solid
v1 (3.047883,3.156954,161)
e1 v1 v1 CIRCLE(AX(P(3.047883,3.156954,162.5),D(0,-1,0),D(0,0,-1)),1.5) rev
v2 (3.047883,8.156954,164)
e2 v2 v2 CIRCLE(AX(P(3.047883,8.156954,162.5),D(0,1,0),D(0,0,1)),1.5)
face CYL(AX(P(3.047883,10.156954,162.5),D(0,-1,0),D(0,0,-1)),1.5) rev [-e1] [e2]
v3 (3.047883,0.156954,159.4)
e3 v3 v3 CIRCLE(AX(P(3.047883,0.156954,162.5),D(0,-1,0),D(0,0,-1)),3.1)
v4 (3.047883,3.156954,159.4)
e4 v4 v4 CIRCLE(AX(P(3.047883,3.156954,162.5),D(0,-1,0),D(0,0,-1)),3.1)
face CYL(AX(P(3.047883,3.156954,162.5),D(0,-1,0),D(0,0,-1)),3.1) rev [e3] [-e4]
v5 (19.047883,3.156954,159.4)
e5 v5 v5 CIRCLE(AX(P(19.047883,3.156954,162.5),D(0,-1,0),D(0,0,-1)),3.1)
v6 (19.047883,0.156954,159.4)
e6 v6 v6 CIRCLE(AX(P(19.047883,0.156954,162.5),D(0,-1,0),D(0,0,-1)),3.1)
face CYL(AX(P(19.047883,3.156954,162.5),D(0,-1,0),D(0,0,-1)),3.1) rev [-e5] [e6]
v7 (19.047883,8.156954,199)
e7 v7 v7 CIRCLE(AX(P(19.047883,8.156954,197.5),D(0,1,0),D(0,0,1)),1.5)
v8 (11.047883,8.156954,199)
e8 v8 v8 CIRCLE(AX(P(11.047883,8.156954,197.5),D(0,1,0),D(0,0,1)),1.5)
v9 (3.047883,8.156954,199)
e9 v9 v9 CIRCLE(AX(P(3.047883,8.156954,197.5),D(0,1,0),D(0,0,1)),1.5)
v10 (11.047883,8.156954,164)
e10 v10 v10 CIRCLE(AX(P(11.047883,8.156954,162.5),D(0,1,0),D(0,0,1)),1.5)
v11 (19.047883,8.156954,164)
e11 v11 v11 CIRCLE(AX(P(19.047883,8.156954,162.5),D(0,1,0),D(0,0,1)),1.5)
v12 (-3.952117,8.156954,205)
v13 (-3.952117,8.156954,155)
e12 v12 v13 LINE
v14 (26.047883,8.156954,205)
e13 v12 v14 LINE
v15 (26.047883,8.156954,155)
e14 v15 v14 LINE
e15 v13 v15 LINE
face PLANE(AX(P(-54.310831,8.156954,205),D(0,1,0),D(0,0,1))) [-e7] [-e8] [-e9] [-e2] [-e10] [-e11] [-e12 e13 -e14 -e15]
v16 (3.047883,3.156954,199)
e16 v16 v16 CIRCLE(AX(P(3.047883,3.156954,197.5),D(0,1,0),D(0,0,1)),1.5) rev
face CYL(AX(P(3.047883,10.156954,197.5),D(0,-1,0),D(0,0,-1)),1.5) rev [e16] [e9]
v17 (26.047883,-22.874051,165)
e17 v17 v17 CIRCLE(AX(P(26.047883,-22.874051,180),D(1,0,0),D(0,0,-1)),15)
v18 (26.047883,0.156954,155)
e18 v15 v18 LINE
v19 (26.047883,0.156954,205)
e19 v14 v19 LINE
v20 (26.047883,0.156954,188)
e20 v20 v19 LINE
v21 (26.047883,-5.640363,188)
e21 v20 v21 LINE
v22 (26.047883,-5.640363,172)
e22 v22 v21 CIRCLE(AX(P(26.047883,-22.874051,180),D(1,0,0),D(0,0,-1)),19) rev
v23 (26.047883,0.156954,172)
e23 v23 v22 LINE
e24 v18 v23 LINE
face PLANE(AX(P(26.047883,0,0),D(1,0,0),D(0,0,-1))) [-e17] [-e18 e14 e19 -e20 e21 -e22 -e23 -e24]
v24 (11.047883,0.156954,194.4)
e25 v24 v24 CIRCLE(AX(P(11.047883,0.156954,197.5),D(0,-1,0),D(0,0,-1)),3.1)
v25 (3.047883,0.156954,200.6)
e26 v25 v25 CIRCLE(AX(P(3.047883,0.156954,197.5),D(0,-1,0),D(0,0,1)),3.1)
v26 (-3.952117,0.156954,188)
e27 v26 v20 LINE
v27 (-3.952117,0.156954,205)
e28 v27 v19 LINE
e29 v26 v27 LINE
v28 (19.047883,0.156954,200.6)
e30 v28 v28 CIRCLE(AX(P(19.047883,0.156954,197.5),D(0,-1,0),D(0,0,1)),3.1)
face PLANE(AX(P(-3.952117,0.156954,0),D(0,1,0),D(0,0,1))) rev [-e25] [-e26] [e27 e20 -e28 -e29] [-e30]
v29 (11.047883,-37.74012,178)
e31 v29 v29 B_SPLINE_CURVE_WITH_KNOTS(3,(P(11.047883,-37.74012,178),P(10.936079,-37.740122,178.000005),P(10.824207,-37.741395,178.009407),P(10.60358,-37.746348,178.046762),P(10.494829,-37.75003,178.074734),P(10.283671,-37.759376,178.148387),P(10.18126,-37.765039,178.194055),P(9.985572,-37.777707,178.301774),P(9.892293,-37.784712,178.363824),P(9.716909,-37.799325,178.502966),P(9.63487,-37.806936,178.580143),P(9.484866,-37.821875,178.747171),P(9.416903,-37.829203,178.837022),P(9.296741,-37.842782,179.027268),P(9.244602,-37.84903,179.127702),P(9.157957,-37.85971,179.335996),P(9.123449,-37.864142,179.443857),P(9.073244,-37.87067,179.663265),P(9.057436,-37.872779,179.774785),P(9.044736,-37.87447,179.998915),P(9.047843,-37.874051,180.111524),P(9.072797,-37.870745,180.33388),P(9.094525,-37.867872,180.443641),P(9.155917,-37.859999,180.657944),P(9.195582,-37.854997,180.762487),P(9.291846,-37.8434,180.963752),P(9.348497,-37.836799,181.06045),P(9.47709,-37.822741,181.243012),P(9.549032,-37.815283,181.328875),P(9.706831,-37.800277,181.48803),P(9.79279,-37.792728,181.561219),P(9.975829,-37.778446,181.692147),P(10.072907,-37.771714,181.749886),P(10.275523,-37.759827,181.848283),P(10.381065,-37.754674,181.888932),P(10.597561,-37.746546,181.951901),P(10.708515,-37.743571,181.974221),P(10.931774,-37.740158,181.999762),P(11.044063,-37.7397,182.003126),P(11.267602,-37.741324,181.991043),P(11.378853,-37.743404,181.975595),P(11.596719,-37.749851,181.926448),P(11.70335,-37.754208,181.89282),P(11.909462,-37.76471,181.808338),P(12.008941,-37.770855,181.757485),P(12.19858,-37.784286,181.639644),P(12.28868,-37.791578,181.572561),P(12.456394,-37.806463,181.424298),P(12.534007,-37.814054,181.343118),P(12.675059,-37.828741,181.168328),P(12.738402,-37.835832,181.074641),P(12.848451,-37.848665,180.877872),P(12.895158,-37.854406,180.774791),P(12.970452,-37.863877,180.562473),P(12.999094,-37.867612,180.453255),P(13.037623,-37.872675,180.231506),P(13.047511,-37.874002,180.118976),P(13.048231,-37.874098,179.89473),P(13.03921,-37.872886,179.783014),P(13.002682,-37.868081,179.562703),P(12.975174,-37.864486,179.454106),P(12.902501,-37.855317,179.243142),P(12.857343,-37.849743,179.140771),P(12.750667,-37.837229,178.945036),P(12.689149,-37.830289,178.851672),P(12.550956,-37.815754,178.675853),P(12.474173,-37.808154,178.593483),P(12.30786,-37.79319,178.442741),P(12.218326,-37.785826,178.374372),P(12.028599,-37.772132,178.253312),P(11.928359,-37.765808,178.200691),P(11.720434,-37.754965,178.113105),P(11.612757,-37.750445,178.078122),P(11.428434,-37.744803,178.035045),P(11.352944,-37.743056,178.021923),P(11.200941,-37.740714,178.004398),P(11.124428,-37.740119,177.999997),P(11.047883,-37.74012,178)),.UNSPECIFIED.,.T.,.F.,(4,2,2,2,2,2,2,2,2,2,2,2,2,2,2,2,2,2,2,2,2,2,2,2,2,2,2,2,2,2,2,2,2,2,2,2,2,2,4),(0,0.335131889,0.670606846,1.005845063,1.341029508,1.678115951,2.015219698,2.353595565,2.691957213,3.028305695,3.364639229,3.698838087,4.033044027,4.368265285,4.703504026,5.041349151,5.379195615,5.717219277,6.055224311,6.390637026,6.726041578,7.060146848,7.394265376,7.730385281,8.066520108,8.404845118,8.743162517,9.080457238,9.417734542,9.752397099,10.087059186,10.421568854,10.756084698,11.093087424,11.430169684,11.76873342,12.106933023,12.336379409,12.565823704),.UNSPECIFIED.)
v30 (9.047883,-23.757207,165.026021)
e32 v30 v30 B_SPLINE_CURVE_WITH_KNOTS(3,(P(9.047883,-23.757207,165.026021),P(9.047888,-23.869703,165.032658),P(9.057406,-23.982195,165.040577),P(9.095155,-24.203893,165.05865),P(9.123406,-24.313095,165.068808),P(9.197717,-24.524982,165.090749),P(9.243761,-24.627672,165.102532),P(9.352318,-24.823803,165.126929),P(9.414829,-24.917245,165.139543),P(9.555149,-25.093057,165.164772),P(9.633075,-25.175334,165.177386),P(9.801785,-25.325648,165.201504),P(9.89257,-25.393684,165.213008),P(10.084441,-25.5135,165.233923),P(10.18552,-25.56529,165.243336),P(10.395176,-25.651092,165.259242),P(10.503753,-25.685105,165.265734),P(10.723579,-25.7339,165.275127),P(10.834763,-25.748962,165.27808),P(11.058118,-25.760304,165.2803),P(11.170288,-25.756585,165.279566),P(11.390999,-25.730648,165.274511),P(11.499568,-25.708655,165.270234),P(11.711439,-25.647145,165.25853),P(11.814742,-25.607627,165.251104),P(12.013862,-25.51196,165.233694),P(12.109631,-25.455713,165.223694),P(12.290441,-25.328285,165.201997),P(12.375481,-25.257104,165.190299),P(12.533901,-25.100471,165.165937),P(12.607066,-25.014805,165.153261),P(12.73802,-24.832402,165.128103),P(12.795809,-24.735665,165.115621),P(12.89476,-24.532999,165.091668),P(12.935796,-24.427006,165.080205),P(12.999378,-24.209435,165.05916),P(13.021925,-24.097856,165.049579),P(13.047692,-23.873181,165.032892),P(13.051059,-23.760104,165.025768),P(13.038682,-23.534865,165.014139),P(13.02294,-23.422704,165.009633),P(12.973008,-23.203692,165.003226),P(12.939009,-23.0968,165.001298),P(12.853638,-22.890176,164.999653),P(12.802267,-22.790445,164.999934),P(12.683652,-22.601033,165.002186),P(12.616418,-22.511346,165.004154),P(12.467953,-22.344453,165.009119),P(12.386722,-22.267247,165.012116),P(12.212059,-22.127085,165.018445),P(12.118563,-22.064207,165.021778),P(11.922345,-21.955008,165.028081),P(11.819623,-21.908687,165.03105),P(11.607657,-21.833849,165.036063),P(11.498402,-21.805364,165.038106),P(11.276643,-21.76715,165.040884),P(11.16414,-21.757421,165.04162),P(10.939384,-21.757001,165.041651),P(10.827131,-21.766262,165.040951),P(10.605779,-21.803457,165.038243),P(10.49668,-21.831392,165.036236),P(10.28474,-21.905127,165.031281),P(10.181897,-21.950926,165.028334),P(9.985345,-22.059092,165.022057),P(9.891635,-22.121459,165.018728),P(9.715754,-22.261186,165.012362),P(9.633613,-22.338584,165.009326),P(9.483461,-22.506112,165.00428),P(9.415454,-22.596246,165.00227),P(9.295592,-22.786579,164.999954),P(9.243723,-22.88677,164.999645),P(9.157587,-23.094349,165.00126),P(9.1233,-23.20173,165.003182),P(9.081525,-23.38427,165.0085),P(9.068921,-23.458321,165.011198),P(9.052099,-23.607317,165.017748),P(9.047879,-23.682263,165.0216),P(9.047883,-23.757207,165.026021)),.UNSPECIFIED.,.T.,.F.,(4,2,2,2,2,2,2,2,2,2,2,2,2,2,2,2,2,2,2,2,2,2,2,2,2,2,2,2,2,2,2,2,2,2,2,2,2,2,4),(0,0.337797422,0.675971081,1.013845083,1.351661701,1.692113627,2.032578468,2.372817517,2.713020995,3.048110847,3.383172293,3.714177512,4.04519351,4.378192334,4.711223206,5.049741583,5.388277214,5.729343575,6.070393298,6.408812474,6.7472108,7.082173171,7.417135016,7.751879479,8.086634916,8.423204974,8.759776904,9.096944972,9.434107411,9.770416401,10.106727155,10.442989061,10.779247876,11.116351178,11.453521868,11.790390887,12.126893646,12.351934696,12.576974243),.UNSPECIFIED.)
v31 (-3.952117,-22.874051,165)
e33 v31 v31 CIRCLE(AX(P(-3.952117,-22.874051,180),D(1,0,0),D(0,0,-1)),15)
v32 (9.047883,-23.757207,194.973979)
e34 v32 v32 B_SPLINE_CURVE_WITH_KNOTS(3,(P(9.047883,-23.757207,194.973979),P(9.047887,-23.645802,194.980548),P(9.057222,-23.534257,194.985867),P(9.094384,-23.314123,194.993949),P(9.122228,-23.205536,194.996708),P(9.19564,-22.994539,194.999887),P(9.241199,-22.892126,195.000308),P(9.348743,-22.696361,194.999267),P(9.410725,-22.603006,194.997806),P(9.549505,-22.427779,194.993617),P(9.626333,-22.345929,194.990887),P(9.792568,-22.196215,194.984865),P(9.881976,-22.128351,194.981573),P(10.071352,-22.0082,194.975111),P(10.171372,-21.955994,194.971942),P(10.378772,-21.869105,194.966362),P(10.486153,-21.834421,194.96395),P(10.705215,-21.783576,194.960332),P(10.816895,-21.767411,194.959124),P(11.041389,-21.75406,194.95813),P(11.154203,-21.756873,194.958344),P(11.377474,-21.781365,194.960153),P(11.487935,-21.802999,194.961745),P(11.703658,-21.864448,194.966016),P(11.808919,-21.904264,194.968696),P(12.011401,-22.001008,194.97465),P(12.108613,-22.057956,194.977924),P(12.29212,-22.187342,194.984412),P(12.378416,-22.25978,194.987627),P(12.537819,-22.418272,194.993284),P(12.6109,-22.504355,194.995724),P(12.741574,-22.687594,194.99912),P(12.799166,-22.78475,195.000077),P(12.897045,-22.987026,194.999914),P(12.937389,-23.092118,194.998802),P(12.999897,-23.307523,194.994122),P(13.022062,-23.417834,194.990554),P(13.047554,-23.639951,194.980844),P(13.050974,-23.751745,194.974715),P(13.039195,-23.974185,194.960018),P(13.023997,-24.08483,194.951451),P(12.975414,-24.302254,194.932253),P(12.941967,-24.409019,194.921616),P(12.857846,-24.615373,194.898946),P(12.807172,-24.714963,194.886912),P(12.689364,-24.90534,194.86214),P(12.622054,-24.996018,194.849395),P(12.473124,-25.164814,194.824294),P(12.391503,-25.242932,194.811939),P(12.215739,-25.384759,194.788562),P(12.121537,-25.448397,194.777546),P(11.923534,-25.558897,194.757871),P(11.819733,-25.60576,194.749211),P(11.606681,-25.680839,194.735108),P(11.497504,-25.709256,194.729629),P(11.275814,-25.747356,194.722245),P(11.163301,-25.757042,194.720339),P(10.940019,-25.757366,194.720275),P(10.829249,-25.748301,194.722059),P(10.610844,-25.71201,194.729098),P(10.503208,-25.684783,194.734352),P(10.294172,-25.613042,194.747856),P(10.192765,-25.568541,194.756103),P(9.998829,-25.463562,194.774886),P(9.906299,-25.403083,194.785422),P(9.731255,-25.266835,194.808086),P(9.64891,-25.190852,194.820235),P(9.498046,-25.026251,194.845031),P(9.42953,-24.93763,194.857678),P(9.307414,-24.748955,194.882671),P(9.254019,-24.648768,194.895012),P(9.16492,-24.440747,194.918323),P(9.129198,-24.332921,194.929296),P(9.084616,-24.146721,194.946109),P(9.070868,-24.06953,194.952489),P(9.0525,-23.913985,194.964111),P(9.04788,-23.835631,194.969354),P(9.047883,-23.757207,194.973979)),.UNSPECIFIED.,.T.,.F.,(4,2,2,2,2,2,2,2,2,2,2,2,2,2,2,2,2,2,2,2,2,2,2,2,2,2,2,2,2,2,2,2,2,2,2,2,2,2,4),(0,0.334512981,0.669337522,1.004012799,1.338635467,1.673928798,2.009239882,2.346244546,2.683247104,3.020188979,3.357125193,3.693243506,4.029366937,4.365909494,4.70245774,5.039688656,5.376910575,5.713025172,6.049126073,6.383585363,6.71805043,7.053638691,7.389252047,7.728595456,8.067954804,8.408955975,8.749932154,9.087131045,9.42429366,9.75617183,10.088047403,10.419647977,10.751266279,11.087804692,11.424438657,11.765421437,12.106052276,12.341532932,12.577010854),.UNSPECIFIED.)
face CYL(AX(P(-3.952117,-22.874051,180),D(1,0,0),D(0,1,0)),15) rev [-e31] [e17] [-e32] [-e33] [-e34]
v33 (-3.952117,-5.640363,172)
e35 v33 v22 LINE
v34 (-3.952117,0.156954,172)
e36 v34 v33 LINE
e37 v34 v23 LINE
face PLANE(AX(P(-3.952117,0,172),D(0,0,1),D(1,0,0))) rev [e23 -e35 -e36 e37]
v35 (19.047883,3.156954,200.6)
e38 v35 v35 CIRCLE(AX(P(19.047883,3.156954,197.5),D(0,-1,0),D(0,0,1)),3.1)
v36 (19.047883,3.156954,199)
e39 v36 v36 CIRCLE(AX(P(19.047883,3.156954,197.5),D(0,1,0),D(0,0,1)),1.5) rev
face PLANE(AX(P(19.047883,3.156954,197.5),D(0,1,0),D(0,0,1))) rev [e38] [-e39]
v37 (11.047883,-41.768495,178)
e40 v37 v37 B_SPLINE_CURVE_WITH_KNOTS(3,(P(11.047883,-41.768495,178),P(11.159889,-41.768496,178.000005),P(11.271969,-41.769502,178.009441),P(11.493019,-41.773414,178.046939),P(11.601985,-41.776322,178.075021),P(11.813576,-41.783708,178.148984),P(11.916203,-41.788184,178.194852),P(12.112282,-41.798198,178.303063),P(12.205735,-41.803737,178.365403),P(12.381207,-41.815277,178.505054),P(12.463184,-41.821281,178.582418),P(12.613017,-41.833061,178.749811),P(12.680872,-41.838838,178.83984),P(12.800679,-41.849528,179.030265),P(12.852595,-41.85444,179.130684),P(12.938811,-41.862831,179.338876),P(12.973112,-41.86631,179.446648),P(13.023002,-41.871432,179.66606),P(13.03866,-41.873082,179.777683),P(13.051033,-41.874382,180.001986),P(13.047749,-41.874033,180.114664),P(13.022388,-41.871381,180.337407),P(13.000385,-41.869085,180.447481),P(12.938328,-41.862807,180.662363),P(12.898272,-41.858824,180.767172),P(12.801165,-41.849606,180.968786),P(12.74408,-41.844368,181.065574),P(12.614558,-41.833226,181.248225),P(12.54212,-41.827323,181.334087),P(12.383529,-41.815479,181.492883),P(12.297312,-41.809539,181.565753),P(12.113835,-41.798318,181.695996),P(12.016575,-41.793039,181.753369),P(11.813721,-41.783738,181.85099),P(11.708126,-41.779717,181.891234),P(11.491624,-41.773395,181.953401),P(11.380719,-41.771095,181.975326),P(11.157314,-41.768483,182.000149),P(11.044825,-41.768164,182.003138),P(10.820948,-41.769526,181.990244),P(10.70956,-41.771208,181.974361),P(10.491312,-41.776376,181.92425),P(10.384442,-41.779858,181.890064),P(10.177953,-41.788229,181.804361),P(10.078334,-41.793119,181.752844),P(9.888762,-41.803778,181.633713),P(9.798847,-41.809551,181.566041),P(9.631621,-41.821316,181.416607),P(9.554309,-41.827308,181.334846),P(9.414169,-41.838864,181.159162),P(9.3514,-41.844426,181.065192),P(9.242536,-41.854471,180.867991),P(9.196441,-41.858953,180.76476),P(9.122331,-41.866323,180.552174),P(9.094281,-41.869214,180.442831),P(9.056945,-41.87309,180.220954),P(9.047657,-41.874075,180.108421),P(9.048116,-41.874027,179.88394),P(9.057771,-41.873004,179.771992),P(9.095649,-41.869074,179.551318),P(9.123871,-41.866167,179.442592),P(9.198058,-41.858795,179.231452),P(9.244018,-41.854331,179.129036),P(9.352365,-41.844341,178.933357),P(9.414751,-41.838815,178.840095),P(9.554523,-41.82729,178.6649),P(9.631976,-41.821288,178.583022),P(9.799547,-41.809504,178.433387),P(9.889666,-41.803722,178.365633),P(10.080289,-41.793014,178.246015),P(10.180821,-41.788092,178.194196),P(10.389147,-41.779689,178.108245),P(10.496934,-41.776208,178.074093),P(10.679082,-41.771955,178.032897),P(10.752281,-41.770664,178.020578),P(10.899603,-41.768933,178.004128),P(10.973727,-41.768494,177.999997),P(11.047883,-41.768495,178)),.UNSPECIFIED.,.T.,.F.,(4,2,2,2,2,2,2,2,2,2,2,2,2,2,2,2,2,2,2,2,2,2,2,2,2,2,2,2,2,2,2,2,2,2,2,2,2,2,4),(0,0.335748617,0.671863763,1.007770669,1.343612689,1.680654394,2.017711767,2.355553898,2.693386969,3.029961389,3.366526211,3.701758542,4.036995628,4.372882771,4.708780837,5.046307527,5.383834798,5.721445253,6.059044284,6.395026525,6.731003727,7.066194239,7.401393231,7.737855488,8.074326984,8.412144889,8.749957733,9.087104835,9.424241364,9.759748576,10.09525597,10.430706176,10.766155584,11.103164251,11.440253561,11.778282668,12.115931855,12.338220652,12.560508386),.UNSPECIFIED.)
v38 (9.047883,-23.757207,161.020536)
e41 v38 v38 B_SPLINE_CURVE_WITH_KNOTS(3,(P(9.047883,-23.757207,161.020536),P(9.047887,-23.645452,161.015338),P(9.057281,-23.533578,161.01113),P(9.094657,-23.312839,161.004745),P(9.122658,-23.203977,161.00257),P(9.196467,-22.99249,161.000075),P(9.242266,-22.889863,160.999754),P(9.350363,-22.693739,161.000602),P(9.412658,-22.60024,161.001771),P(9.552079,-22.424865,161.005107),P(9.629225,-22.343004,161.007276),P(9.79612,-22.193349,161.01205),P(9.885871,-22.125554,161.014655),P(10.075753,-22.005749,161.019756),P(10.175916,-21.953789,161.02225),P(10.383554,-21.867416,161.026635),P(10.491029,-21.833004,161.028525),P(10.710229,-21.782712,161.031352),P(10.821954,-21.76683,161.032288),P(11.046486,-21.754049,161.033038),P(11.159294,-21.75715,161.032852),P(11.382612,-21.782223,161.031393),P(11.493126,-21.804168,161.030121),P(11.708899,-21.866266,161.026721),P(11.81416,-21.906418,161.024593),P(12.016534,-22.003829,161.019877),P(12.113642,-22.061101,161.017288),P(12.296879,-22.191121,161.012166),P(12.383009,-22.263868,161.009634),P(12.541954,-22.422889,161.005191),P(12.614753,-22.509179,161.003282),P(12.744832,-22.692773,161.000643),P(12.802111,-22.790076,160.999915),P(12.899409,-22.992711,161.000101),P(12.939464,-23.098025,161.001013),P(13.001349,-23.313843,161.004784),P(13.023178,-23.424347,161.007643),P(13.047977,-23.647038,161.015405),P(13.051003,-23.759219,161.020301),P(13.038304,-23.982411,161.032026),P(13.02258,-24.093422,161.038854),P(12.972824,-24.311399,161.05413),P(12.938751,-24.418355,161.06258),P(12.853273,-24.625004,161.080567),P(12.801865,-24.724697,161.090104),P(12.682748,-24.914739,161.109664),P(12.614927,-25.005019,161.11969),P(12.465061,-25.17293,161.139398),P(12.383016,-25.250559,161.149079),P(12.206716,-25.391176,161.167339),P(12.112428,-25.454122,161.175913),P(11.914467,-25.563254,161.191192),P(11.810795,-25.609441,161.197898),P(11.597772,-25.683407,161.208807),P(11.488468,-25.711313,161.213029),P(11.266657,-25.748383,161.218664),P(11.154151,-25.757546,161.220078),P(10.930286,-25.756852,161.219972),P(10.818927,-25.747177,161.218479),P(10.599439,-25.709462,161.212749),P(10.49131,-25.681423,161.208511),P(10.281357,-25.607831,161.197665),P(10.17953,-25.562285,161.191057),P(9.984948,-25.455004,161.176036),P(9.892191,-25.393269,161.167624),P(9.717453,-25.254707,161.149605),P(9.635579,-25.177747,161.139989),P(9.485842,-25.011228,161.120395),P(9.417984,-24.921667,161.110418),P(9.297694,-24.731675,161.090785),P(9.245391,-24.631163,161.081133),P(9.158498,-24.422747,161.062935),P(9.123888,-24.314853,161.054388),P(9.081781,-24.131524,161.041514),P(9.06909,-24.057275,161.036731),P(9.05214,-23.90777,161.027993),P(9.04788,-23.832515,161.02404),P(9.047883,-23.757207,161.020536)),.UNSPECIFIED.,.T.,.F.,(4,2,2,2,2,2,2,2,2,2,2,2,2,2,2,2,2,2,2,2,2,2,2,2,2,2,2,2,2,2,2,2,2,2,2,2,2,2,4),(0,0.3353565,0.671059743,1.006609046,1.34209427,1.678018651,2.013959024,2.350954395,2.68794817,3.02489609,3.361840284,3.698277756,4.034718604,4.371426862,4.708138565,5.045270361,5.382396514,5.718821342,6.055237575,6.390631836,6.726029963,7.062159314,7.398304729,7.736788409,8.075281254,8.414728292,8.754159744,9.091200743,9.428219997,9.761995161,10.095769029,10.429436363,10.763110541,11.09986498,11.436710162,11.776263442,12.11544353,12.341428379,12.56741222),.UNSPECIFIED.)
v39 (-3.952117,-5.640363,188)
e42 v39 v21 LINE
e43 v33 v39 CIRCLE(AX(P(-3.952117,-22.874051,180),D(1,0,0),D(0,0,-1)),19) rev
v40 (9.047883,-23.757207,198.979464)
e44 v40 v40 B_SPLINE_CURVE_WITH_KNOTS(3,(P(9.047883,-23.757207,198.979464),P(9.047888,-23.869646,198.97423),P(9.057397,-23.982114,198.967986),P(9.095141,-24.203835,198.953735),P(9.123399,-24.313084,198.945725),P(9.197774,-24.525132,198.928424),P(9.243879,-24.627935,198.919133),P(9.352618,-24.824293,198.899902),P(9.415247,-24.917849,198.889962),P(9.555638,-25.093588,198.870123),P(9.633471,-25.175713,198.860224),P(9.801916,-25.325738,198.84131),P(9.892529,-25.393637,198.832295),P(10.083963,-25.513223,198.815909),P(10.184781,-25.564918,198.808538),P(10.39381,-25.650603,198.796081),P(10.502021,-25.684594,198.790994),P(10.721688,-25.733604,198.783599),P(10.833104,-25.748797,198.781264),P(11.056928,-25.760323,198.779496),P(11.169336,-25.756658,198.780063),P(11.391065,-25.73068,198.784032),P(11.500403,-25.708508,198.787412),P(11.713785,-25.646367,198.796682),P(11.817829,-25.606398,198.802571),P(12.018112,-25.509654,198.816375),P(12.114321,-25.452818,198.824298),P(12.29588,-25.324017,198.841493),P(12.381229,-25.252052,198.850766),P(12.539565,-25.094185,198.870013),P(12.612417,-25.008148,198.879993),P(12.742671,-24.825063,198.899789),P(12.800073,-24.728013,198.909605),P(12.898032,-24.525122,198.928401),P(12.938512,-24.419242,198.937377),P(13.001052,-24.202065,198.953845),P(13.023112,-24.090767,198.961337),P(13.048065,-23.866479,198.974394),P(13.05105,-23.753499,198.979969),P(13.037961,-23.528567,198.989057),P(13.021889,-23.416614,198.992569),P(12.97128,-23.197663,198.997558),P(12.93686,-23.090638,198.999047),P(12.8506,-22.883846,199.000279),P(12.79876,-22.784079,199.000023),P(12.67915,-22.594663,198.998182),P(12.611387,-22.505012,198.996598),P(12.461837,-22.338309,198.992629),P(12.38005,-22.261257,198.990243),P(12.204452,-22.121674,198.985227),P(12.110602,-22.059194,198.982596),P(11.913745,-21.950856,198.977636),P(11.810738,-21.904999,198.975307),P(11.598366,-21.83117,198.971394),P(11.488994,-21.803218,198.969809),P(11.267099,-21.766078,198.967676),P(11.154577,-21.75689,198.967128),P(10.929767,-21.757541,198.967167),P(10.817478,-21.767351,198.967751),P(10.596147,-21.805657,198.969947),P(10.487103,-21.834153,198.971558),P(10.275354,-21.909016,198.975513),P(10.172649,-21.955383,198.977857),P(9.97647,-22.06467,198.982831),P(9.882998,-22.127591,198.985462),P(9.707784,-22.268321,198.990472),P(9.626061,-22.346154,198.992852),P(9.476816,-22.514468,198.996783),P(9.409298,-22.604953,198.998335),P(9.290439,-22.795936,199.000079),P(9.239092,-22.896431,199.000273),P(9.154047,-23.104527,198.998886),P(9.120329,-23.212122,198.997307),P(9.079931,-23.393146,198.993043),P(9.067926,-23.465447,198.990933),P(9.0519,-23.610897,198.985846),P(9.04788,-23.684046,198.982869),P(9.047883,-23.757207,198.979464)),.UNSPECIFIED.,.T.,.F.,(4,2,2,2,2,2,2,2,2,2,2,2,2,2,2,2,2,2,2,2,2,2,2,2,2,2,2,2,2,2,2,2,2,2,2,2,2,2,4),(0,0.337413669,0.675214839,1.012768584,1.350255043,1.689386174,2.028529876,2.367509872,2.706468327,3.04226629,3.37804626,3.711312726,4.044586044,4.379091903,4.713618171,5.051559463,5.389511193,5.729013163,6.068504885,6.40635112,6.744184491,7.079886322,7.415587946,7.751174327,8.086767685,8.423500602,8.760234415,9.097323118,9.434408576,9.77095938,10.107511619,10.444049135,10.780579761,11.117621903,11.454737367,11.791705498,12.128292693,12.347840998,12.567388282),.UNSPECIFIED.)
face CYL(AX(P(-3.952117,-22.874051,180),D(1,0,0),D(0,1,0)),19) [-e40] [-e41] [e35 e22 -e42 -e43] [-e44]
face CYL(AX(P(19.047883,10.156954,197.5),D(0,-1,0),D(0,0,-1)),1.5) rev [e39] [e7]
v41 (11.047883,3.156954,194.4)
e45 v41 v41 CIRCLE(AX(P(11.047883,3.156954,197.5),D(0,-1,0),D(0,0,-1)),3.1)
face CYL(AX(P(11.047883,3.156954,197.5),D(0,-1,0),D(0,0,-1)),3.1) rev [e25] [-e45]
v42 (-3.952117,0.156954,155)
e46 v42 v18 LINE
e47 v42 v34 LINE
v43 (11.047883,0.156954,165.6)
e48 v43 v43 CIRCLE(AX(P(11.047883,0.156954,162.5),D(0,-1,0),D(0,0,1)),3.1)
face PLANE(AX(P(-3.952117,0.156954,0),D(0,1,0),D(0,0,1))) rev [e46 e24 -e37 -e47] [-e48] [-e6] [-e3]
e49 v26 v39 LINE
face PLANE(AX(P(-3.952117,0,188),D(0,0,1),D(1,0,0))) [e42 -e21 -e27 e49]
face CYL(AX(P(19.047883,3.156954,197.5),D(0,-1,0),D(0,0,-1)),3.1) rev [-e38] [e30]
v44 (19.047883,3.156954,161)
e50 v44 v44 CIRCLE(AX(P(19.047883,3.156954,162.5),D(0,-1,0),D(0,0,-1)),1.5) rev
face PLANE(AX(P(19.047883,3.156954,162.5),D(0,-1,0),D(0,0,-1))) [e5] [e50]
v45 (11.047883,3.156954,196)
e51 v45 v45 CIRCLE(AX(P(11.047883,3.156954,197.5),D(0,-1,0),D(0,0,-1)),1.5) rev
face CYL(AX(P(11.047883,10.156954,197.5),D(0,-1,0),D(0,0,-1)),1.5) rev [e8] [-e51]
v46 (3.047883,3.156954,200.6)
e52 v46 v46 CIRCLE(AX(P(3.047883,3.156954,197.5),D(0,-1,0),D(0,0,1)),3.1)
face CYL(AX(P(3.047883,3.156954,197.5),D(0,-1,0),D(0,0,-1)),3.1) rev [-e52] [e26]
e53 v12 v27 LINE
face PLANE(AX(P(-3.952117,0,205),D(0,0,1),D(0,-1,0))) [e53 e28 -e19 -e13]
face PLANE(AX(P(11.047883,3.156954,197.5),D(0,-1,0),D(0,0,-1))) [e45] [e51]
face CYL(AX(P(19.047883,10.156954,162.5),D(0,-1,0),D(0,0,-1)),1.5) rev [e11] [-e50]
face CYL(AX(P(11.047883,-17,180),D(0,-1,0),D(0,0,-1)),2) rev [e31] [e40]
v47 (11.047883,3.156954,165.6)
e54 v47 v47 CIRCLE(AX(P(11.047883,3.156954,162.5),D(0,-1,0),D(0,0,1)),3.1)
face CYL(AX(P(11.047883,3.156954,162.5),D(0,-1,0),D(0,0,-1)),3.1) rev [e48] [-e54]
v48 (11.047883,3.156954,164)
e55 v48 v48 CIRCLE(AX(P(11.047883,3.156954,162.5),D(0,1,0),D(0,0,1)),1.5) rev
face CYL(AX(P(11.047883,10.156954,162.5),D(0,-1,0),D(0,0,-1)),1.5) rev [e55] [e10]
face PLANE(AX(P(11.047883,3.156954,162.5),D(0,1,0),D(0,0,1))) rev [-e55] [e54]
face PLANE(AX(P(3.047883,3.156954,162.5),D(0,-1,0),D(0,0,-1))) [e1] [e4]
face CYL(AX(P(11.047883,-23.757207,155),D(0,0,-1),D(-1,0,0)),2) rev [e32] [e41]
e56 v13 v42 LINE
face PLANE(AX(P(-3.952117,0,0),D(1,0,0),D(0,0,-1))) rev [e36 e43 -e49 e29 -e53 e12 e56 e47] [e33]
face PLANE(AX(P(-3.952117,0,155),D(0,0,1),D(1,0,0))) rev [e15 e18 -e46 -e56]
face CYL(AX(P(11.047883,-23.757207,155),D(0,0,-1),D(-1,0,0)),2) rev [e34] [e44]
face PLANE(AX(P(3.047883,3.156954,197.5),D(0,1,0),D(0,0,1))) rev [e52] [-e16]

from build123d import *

# Parameters (mm, degrees)
EXTRUDE_START            = -30
EXTRUDE_1_OUTLINE_R      = 15
EXTRUDE_1_DEPTH          = 30
SKETCH_2_W               = 50.000000035
SKETCH_2_H               = 6
EXTRUDE_2_DEPTH          = 30
SKETCH_3_R               = 1.5
CUT_EXTRUDE_1_DEPTH      = 10
SKETCH_4_R               = 3.1
CUT_EXTRUDE_2_DEPTH      = 3
SKETCH_5_R               = 2
CUT_EXTRUDE_3_DEPTH      = 33
CUT_EXTRUDE_4_DEPTH      = 211.848116868
CUT_EXTRUDE_4_DEPTH_BACK = 211.848116868
SKETCH_6_R               = 2


# Read off the part's stored shape, not the designer's step: 填料-伸長1
with BuildPart() as part:
    # 填料-伸長1 outline → 填料-伸長1 (new body)
    with BuildSketch(Plane(origin=(26.04788271, 0, 0), x_dir=(0, 0, -1), z_dir=(1, 0, 0)).offset(EXTRUDE_START)):
        with BuildLine():
            Line((-188, 0.156954032), (-188, -5.64036342))
            ThreePointArc((-188, -5.64036342), (-180, -41.87405136), (-172, -5.64036342))
            Line((-172, -5.64036342), (-172, 0.156954032))
            Line((-172, 0.156954032), (-155, 0.156954032))
            Line((-155, 0.156954032), (-155, 2.156954032))
            Line((-155, 2.156954032), (-205, 2.156954032))
            Line((-205, 2.156954032), (-205, 0.156954032))
            Line((-205, 0.156954032), (-188, 0.156954032))
        make_face()
        with Locations((-180, -22.87405136)):
            Circle(EXTRUDE_1_OUTLINE_R, mode=Mode.SUBTRACT)
    extrude(amount=EXTRUDE_1_DEPTH)

    # 草圖2 → 填料-伸長2 (add)
    with BuildSketch(Plane(origin=(26.04788271, 0, 0), x_dir=(0, 0, -1), z_dir=(1, 0, 0))):
        with Locations((-179.999999983, 5.156954032)):
            Rectangle(SKETCH_2_W, SKETCH_2_H)
    extrude(amount=-EXTRUDE_2_DEPTH)

    # 草圖3 → 除料-伸長1 (cut)
    with BuildSketch(Plane.XZ.offset(-0.156954032)):
        with Locations(Location((19.04788271, 197.5, 0), (0, 0, 270))):
            Circle(SKETCH_3_R)
        with Locations(Location((19.04788271, 162.5, 0), (0, 0, 90))):
            Circle(SKETCH_3_R)
        with Locations(Location((3.04788271, 197.5, 0), (0, 0, 270))):
            Circle(SKETCH_3_R)
        with Locations(Location((3.04788271, 162.5, 0), (0, 0, 90))):
            Circle(SKETCH_3_R)
        with Locations(Location((11.04788271, 197.5, 0), (0, 0, 270))):
            Circle(SKETCH_3_R)
        with Locations(Location((11.04788271, 162.5, 0), (0, 0, 90))):
            Circle(SKETCH_3_R)
    extrude(amount=-CUT_EXTRUDE_1_DEPTH, mode=Mode.SUBTRACT)

    # 草圖4 → 除料-伸長2 (cut)
    with BuildSketch(Plane.XZ.offset(-0.156954032)):
        with Locations(Location((19.04788271, 162.5, 0), (0, 0, 270))):
            Circle(SKETCH_4_R)
        with Locations(Location((3.04788271, 162.5, 0), (0, 0, 270))):
            Circle(SKETCH_4_R)
        with Locations(Location((3.04788271, 197.5, 0), (0, 0, 90))):
            Circle(SKETCH_4_R)
        with Locations(Location((19.04788271, 197.5, 0), (0, 0, 90))):
            Circle(SKETCH_4_R)
        with Locations(Location((11.04788271, 197.5, 0), (0, 0, 270))):
            Circle(SKETCH_4_R)
        with Locations(Location((11.04788271, 162.5, 0), (0, 0, 90))):
            Circle(SKETCH_4_R)
    extrude(amount=-CUT_EXTRUDE_2_DEPTH, mode=Mode.SUBTRACT)

    # 草圖5 → 除料-伸長3 (cut)
    with BuildSketch(Plane(origin=(0, -50, 0), x_dir=(1, 0, 0), z_dir=(0, 1, 0))):
        with Locations(Location((11.04788271, -180, 0), (0, 0, 90))):
            Circle(SKETCH_5_R)
    extrude(amount=CUT_EXTRUDE_3_DEPTH, mode=Mode.SUBTRACT)

    # 草圖6 → 除料-伸長4 (cut, two sides: drawn at the far end of the back side and taken through both)
    with BuildSketch(Plane.XY.offset(-CUT_EXTRUDE_4_DEPTH_BACK)):
        with Locations(Location((11.04788271, -23.75720739, 0), (0, 0, 180))):
            Circle(SKETCH_6_R)
    extrude(amount=CUT_EXTRUDE_4_DEPTH + CUT_EXTRUDE_4_DEPTH_BACK, mode=Mode.SUBTRACT)


solid = part.part
